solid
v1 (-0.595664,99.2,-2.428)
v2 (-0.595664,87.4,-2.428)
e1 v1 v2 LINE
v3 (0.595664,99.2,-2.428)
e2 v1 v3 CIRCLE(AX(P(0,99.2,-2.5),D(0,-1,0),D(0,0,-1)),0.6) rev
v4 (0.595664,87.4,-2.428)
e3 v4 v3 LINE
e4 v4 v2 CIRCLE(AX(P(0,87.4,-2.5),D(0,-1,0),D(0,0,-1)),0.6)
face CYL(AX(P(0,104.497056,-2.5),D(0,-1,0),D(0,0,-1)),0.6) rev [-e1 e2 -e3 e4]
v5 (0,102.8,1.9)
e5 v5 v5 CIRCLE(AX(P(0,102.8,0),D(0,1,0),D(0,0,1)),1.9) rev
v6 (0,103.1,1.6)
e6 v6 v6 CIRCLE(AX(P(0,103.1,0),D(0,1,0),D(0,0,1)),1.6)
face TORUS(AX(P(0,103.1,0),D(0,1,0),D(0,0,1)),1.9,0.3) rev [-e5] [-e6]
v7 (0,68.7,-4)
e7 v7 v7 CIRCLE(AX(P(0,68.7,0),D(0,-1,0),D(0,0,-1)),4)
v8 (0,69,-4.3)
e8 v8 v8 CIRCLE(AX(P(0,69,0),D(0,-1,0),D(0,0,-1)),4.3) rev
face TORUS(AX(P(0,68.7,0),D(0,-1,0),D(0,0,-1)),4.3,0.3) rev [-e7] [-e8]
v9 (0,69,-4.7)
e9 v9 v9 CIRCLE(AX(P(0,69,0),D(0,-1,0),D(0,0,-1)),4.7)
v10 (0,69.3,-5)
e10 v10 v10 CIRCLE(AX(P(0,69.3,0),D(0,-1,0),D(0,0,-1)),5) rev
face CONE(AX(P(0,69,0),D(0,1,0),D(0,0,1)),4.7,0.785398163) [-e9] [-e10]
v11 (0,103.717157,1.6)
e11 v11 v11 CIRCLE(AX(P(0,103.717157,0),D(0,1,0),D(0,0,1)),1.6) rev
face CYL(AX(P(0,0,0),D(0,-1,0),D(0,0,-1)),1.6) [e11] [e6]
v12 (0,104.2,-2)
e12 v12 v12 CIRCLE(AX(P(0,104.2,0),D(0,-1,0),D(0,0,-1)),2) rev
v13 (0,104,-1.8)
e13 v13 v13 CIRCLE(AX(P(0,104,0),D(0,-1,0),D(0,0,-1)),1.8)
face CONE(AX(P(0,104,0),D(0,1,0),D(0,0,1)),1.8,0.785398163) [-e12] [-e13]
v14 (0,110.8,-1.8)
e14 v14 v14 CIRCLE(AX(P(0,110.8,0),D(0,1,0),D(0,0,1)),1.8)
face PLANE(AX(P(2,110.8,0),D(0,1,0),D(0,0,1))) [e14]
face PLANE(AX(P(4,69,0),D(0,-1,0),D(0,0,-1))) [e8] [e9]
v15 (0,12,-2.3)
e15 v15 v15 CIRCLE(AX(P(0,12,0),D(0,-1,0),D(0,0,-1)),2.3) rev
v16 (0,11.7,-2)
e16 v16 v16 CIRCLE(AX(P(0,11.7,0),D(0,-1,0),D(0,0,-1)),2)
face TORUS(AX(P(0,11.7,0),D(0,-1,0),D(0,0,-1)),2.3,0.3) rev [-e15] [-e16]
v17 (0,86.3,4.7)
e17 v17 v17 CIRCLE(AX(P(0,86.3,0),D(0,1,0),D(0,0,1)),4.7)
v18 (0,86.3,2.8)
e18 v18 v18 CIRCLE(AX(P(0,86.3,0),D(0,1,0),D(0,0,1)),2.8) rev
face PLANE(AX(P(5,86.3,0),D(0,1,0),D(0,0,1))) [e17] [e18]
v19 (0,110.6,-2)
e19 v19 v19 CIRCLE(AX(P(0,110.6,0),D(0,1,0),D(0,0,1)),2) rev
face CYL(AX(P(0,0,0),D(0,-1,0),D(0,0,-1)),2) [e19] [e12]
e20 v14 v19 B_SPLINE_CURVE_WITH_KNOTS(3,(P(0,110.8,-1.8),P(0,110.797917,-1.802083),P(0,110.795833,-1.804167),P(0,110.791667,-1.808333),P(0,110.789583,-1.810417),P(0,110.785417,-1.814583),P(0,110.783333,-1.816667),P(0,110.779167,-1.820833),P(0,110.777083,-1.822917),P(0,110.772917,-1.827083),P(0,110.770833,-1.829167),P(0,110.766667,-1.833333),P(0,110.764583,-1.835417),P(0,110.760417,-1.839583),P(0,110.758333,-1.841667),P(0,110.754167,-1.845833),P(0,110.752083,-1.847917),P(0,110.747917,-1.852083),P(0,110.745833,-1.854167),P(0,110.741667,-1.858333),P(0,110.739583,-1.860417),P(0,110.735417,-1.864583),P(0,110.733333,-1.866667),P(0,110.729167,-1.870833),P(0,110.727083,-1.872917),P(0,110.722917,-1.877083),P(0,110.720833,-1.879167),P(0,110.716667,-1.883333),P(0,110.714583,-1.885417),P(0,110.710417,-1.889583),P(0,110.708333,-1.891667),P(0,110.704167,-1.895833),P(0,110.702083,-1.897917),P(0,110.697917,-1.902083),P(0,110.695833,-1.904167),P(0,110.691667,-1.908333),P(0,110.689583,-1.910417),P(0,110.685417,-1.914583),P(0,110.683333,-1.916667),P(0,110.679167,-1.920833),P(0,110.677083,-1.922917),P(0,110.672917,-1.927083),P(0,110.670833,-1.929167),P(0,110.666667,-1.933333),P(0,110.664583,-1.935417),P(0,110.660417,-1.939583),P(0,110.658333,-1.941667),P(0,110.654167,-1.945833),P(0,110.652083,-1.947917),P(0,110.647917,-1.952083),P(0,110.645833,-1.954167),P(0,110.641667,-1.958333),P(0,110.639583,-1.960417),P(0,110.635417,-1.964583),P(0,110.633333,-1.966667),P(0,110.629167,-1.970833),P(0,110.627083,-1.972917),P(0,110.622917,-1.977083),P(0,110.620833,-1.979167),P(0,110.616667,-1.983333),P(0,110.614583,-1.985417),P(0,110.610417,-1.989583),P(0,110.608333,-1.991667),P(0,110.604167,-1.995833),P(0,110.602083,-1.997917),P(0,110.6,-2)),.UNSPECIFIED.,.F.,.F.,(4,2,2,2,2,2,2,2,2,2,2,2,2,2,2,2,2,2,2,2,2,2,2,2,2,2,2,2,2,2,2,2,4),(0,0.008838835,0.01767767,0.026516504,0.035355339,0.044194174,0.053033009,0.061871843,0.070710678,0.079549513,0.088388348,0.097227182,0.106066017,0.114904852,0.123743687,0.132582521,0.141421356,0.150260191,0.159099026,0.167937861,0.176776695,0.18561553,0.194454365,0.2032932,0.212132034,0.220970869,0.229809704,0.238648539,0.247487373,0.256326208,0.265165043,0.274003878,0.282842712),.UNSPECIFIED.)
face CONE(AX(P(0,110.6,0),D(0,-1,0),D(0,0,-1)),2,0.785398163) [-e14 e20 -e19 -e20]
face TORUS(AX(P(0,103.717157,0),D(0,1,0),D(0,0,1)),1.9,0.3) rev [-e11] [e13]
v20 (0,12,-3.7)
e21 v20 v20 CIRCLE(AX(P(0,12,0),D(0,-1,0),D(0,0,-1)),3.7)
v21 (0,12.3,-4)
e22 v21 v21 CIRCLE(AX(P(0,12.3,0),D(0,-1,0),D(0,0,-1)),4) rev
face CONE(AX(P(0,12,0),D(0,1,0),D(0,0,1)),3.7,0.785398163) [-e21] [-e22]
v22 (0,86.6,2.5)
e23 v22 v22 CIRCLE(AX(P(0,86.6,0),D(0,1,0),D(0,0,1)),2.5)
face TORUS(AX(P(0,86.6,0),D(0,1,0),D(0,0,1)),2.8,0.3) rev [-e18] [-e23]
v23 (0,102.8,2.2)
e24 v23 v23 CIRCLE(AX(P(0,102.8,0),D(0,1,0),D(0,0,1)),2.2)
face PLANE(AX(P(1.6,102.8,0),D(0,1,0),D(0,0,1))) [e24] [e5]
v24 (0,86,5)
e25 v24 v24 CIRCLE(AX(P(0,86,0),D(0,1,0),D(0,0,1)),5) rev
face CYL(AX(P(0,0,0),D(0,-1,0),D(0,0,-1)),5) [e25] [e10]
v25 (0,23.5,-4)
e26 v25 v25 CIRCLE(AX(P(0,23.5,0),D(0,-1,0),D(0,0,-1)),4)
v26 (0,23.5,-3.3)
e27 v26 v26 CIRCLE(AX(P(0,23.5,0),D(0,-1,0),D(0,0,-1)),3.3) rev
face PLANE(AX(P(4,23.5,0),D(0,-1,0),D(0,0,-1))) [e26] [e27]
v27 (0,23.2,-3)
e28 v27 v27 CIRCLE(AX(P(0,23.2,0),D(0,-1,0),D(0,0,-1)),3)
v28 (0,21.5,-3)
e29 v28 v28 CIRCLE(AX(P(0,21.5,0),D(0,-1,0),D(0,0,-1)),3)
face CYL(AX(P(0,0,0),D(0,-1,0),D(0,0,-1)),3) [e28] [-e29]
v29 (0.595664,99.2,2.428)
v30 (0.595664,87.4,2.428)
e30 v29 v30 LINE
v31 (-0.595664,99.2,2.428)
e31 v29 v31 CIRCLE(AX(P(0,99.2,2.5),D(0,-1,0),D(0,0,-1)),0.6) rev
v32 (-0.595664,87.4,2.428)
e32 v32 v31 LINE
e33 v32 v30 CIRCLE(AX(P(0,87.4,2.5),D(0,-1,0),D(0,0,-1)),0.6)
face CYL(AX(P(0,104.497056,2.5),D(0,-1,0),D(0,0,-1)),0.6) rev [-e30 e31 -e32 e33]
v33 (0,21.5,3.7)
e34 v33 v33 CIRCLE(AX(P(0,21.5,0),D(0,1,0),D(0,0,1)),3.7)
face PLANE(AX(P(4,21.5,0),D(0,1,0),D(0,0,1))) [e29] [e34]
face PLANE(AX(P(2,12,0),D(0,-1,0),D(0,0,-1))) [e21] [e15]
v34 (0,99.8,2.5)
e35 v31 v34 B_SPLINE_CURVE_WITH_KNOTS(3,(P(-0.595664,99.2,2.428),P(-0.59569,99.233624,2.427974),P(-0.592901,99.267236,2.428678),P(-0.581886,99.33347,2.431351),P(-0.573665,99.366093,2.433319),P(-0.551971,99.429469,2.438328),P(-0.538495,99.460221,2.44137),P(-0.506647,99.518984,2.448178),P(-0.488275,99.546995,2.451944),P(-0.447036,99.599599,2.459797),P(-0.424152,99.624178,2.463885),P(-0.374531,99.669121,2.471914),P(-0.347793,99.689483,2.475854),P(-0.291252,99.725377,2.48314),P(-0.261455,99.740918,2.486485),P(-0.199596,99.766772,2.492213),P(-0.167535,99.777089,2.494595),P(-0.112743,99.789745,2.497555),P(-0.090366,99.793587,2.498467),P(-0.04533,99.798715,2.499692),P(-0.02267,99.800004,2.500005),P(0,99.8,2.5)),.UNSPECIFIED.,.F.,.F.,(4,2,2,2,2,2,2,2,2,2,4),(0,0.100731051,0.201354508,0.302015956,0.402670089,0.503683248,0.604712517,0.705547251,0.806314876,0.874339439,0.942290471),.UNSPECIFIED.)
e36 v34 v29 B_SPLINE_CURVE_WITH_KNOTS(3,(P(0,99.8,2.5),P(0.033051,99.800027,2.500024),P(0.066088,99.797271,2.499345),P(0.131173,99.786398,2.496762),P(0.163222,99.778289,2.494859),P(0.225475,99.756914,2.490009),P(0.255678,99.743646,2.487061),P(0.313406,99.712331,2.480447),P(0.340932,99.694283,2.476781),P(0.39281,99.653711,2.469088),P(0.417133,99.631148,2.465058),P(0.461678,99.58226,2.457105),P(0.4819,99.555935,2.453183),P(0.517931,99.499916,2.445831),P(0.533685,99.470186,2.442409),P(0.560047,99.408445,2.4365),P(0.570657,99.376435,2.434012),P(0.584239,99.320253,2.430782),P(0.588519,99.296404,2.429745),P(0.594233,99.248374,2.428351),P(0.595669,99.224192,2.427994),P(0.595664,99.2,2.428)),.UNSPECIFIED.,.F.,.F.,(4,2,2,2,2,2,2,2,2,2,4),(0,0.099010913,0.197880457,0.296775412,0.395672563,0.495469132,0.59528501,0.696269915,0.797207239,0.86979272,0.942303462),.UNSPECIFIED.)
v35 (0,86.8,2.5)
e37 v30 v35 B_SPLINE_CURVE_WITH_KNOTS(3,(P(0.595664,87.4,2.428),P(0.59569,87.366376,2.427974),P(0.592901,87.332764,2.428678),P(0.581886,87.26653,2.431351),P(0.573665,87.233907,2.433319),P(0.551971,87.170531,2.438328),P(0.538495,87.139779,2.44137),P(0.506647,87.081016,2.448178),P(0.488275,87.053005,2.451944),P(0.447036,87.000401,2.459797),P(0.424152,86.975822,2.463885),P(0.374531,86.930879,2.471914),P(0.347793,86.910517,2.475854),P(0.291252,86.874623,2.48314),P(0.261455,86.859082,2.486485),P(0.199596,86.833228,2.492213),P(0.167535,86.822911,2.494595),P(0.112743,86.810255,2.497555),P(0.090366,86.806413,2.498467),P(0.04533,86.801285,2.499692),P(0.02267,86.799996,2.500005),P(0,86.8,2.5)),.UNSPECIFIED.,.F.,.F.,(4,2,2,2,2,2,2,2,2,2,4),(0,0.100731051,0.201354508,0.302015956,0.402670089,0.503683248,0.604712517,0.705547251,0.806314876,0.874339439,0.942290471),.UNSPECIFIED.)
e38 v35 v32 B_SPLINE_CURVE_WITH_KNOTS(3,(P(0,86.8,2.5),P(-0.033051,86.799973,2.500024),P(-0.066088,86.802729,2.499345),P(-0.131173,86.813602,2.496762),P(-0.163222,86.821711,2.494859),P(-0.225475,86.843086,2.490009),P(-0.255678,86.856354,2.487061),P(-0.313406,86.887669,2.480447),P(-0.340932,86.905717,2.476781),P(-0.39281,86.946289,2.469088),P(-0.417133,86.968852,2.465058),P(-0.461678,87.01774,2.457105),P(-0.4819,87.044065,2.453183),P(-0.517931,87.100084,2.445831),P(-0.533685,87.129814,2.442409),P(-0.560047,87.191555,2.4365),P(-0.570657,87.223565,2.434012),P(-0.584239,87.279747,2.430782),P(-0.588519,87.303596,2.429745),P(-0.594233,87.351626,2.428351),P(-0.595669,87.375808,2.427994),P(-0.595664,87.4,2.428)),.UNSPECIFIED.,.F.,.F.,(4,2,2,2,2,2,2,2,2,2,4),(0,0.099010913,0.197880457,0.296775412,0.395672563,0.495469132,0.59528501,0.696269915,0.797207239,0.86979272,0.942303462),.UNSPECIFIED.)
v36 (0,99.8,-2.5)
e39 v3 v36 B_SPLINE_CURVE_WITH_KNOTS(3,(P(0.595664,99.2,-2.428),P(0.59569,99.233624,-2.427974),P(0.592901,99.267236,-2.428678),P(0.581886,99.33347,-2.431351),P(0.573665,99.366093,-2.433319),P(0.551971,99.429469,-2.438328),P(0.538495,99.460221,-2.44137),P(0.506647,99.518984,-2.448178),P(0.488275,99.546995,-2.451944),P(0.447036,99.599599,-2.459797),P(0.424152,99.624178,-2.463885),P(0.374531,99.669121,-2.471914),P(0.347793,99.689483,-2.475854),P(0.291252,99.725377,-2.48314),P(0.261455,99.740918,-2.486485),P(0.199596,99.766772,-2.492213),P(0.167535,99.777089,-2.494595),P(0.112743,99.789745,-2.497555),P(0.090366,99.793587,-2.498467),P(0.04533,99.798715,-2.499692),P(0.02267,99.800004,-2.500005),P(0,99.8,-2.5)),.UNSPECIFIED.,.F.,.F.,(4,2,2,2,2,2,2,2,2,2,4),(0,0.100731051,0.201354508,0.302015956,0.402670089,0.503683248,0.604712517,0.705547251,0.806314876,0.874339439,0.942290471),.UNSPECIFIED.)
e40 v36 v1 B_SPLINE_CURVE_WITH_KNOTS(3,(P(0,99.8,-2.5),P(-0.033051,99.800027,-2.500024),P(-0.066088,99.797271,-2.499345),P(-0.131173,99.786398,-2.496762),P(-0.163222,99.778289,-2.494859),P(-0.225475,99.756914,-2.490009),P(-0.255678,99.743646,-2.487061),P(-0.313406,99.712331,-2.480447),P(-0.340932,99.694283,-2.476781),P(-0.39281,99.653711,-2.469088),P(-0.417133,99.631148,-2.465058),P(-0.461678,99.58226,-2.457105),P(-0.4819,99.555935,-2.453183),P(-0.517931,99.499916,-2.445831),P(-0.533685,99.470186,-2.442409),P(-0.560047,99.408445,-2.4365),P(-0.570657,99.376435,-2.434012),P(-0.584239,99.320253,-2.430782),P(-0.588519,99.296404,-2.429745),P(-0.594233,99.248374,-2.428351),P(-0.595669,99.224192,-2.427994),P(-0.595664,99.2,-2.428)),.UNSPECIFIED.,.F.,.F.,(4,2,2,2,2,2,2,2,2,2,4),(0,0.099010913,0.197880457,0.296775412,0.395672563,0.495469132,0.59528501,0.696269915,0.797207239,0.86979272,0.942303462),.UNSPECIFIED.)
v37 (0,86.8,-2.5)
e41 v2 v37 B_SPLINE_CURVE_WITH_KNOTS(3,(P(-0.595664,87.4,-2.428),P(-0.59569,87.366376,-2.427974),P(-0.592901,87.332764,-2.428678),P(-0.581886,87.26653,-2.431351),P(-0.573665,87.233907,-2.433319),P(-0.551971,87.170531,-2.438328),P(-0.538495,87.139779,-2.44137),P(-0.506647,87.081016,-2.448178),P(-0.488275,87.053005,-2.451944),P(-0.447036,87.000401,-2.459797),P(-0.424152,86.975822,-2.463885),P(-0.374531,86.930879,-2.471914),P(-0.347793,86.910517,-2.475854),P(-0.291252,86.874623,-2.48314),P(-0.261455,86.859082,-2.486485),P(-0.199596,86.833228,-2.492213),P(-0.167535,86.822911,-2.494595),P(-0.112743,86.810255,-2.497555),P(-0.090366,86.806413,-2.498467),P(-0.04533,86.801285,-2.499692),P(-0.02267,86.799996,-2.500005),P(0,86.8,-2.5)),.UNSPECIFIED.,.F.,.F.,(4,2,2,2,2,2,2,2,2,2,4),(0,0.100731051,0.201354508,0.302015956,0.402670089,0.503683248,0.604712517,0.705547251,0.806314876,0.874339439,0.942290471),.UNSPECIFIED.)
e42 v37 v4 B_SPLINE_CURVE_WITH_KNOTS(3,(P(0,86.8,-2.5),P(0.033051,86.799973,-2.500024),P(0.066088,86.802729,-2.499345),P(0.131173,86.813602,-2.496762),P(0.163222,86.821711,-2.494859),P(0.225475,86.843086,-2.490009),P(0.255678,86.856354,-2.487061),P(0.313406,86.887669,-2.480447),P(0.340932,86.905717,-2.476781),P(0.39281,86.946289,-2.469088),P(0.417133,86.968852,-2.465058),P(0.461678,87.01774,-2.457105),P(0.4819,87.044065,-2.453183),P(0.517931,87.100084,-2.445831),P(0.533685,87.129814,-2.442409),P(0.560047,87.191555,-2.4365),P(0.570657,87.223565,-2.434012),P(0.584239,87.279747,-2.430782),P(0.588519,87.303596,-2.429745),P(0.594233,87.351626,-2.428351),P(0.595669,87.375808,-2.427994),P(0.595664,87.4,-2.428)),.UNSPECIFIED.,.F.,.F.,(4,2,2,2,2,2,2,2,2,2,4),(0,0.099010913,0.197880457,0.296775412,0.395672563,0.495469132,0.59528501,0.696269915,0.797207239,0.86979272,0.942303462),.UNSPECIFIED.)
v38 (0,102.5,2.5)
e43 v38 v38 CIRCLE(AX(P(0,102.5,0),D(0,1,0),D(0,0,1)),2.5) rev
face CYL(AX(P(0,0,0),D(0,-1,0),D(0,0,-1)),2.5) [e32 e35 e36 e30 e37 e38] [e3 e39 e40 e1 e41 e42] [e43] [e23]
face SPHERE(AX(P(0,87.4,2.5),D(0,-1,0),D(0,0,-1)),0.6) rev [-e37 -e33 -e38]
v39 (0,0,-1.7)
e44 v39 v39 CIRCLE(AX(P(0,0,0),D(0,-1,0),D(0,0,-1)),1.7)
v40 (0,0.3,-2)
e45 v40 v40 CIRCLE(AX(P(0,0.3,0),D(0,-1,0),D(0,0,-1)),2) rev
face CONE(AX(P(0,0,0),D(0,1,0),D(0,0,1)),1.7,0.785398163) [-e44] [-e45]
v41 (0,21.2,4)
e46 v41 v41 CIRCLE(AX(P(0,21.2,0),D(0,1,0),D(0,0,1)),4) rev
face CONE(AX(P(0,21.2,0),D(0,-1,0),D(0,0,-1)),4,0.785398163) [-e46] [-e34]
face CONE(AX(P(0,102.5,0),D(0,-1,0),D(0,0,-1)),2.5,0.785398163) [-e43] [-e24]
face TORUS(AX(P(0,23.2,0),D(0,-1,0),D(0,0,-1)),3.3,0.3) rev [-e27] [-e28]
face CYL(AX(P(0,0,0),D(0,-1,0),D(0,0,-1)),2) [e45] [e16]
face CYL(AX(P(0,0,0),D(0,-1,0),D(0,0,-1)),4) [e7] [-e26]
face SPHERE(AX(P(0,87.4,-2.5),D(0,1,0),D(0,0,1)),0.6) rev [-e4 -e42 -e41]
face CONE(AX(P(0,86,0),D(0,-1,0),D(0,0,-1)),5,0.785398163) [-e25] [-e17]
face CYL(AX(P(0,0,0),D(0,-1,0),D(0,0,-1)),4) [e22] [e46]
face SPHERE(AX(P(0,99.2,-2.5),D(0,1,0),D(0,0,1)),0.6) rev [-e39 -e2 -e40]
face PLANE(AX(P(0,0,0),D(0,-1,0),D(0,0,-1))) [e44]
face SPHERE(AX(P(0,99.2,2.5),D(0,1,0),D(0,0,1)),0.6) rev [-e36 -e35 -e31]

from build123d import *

# Parameters (mm, degrees)
SKETCH2_R          = 0.6
CUT_EXTRUDE1_DEPTH = 13
FILLET1_R          = 0.6
CHAMFER1_SIZE      = 0.3
CHAMFER2_SIZE      = 0.3
CHAMFER3_SIZE      = 0.3
CHAMFER4_SIZE      = 0.3
CHAMFER5_SIZE      = 0.2
FILLET2_R          = 0.3


# Some blends are built 0.0001 mm under size
with BuildPart() as part:
    # Sketch1 → Revolve1 (revolve)
    with BuildSketch(Plane.XY, mode=Mode.PRIVATE) as revolve1_sk:
        Polygon((0, 0), (2, 0), (2, 12), (4, 12), (4, 21.5), (3, 21.5), (3, 23.5), (4, 23.5), (4, 69), (5, 69), (5, 86.3), (2.5, 86.3), (2.5, 102.8), (1.6, 102.8), (1.6, 104), (2, 104), (2, 110.8), (0, 110.8), align=None)
    revolve(revolve1_sk.sketch.rotate(Axis((0, 0, 0), (0, 1, 0)), 90), axis=Axis((0, 0, 0), (0, 1, 0)))

    # Sketch2 → Cut-Extrude1 (cut)
    with BuildSketch(Plane(origin=(0, 86.8, 0), x_dir=(1, 0, 0), z_dir=(0, 1, 0))):
        with Locations((0, 2.5)):
            Circle(SKETCH2_R)
        with Locations((0, -2.5)):
            Circle(SKETCH2_R)
    extrude(amount=CUT_EXTRUDE1_DEPTH, mode=Mode.SUBTRACT)

    # Fillet1
    fillet1_edges = [part.edges().sort_by_distance(p)[0] for p in [
        (0, 99.8, -1.9),
        (0, 86.8, -1.9),
        (0, 86.8, 1.9),
        (0, 99.8, 1.9),
    ]]
    fillet(fillet1_edges, radius=FILLET1_R - 0.0001)  # a hair under: the kernel refuses the full size

    # Chamfer1
    chamfer1_edges = [part.edges().sort_by_distance(p)[0] for p in [
        (0, 86.3, 5),
        (0, 69, 5),
    ]]
    chamfer(chamfer1_edges, length=CHAMFER1_SIZE)

    # Chamfer2
    chamfer2_edges = [part.edges().sort_by_distance(p)[0] for p in [
        (0, 21.5, 4),
        (0, 12, 4),
    ]]
    chamfer(chamfer2_edges, length=CHAMFER2_SIZE)

    # Chamfer3
    chamfer3_edges = [part.edges().sort_by_distance(p)[0] for p in [
        (0, 0, 2),
    ]]
    chamfer(chamfer3_edges, length=CHAMFER3_SIZE)

    # Chamfer4
    chamfer4_edges = [part.edges().sort_by_distance(p)[0] for p in [
        (0, 102.8, 2.5),
    ]]
    chamfer(chamfer4_edges, length=CHAMFER4_SIZE)

    # Chamfer5
    chamfer5_edges = [part.edges().sort_by_distance(p)[0] for p in [
        (0, 110.8, 2),
        (0, 104, 2),
    ]]
    chamfer(chamfer5_edges, length=CHAMFER5_SIZE)

    # Fillet2
    # the kernel refuses this fillet: 0.3 mm, written as the material it adds along each edge
    with BuildSketch(Plane(origin=(0, 104, 0), x_dir=(0, 0, -1), z_dir=(1, 0, 0))) as fillet2_piece_1:
        with BuildLine():
            CenterArc((1.9, -0.282842712), FILLET2_R, 109.471220634, 70.528779366)
            Line((1.6, -0.282842712), (1.594, -0.282842712))
            Line((1.594, -0.282842712), (1.594, 0))
            Line((1.594, 0), (1.6, 0.006))
            ThreePointArc((1.6, 0.006), (1.7, 0.006), (1.798, 0.005656854))
            Line((1.798, 0.005656854), (1.8, 0))
        make_face()
    revolve(axis=Axis((0, 104, 0), (0, 1, 0)))
    with BuildSketch(Plane(origin=(0, 102.8, 0), x_dir=(0, 0, -1), z_dir=(1, 0, 0))) as fillet2_piece_2:
        with BuildLine():
            CenterArc((1.6 + FILLET2_R, FILLET2_R), FILLET2_R, 180, 90)
            Line((1.6 + FILLET2_R, 0), (1.6 + FILLET2_R, -FILLET2_R * 0.02))
            Line((1.6 + FILLET2_R, -FILLET2_R * 0.02), (1.6 - FILLET2_R * 0.02, -FILLET2_R * 0.02))
            Line((1.6 - FILLET2_R * 0.02, -FILLET2_R * 0.02), (1.6 - FILLET2_R * 0.02, FILLET2_R))
            Line((1.6 - FILLET2_R * 0.02, FILLET2_R), (1.6, FILLET2_R))
        make_face()
    revolve(axis=Axis((0, 102.8, 0), (0, 1, 0)))
    with BuildSketch(Plane(origin=(0, 86.3, 0), x_dir=(0, 0, -1), z_dir=(1, 0, 0))) as fillet2_piece_3:
        with BuildLine():
            CenterArc((2.5 + FILLET2_R, FILLET2_R), FILLET2_R, 180, 90)
            Line((2.5 + FILLET2_R, 0), (2.5 + FILLET2_R, -FILLET2_R * 0.02))
            Line((2.5 + FILLET2_R, -FILLET2_R * 0.02), (2.5 - FILLET2_R * 0.02, -FILLET2_R * 0.02))
            Line((2.5 - FILLET2_R * 0.02, -FILLET2_R * 0.02), (2.5 - FILLET2_R * 0.02, FILLET2_R))
            Line((2.5 - FILLET2_R * 0.02, FILLET2_R), (2.5, FILLET2_R))
        make_face()
    revolve(axis=Axis((0, 86.3, 0), (0, 1, 0)))
    with BuildSketch(Plane(origin=(0, 69, 0), x_dir=(0, 0, -1), z_dir=(1, 0, 0))) as fillet2_piece_4:
        with BuildLine():
            CenterArc((4 + FILLET2_R, -FILLET2_R), FILLET2_R, 90, 90)
            Line((4, -FILLET2_R), (4 - FILLET2_R * 0.02, -FILLET2_R))
            Line((4 - FILLET2_R * 0.02, -FILLET2_R), (4 - FILLET2_R * 0.02, FILLET2_R * 0.02))
            Line((4 - FILLET2_R * 0.02, FILLET2_R * 0.02), (4 + FILLET2_R, FILLET2_R * 0.02))
            Line((4 + FILLET2_R, FILLET2_R * 0.02), (4 + FILLET2_R, 0))
        make_face()
    revolve(axis=Axis((0, 69, 0), (0, 1, 0)))
    with BuildSketch(Plane(origin=(0, 23.5, 0), x_dir=(0, 0, -1), z_dir=(1, 0, 0))) as fillet2_piece_5:
        with BuildLine():
            CenterArc((3 + FILLET2_R, -FILLET2_R), FILLET2_R, 90, 90)
            Line((3, -FILLET2_R), (3 - FILLET2_R * 0.02, -FILLET2_R))
            Line((3 - FILLET2_R * 0.02, -FILLET2_R), (3 - FILLET2_R * 0.02, FILLET2_R * 0.02))
            Line((3 - FILLET2_R * 0.02, FILLET2_R * 0.02), (3 + FILLET2_R, FILLET2_R * 0.02))
            Line((3 + FILLET2_R, FILLET2_R * 0.02), (3 + FILLET2_R, 0))
        make_face()
    revolve(axis=Axis((0, 23.5, 0), (0, 1, 0)))
    with BuildSketch(Plane(origin=(0, 12, 0), x_dir=(0, 0, -1), z_dir=(1, 0, 0))) as fillet2_piece_6:
        with BuildLine():
            CenterArc((2 + FILLET2_R, -FILLET2_R), FILLET2_R, 90, 90)
            Line((2, -FILLET2_R), (2 - FILLET2_R * 0.02, -FILLET2_R))
            Line((2 - FILLET2_R * 0.02, -FILLET2_R), (2 - FILLET2_R * 0.02, FILLET2_R * 0.02))
            Line((2 - FILLET2_R * 0.02, FILLET2_R * 0.02), (2 + FILLET2_R, FILLET2_R * 0.02))
            Line((2 + FILLET2_R, FILLET2_R * 0.02), (2 + FILLET2_R, 0))
        make_face()
    revolve(axis=Axis((0, 12, 0), (0, 1, 0)))


solid = part.part
